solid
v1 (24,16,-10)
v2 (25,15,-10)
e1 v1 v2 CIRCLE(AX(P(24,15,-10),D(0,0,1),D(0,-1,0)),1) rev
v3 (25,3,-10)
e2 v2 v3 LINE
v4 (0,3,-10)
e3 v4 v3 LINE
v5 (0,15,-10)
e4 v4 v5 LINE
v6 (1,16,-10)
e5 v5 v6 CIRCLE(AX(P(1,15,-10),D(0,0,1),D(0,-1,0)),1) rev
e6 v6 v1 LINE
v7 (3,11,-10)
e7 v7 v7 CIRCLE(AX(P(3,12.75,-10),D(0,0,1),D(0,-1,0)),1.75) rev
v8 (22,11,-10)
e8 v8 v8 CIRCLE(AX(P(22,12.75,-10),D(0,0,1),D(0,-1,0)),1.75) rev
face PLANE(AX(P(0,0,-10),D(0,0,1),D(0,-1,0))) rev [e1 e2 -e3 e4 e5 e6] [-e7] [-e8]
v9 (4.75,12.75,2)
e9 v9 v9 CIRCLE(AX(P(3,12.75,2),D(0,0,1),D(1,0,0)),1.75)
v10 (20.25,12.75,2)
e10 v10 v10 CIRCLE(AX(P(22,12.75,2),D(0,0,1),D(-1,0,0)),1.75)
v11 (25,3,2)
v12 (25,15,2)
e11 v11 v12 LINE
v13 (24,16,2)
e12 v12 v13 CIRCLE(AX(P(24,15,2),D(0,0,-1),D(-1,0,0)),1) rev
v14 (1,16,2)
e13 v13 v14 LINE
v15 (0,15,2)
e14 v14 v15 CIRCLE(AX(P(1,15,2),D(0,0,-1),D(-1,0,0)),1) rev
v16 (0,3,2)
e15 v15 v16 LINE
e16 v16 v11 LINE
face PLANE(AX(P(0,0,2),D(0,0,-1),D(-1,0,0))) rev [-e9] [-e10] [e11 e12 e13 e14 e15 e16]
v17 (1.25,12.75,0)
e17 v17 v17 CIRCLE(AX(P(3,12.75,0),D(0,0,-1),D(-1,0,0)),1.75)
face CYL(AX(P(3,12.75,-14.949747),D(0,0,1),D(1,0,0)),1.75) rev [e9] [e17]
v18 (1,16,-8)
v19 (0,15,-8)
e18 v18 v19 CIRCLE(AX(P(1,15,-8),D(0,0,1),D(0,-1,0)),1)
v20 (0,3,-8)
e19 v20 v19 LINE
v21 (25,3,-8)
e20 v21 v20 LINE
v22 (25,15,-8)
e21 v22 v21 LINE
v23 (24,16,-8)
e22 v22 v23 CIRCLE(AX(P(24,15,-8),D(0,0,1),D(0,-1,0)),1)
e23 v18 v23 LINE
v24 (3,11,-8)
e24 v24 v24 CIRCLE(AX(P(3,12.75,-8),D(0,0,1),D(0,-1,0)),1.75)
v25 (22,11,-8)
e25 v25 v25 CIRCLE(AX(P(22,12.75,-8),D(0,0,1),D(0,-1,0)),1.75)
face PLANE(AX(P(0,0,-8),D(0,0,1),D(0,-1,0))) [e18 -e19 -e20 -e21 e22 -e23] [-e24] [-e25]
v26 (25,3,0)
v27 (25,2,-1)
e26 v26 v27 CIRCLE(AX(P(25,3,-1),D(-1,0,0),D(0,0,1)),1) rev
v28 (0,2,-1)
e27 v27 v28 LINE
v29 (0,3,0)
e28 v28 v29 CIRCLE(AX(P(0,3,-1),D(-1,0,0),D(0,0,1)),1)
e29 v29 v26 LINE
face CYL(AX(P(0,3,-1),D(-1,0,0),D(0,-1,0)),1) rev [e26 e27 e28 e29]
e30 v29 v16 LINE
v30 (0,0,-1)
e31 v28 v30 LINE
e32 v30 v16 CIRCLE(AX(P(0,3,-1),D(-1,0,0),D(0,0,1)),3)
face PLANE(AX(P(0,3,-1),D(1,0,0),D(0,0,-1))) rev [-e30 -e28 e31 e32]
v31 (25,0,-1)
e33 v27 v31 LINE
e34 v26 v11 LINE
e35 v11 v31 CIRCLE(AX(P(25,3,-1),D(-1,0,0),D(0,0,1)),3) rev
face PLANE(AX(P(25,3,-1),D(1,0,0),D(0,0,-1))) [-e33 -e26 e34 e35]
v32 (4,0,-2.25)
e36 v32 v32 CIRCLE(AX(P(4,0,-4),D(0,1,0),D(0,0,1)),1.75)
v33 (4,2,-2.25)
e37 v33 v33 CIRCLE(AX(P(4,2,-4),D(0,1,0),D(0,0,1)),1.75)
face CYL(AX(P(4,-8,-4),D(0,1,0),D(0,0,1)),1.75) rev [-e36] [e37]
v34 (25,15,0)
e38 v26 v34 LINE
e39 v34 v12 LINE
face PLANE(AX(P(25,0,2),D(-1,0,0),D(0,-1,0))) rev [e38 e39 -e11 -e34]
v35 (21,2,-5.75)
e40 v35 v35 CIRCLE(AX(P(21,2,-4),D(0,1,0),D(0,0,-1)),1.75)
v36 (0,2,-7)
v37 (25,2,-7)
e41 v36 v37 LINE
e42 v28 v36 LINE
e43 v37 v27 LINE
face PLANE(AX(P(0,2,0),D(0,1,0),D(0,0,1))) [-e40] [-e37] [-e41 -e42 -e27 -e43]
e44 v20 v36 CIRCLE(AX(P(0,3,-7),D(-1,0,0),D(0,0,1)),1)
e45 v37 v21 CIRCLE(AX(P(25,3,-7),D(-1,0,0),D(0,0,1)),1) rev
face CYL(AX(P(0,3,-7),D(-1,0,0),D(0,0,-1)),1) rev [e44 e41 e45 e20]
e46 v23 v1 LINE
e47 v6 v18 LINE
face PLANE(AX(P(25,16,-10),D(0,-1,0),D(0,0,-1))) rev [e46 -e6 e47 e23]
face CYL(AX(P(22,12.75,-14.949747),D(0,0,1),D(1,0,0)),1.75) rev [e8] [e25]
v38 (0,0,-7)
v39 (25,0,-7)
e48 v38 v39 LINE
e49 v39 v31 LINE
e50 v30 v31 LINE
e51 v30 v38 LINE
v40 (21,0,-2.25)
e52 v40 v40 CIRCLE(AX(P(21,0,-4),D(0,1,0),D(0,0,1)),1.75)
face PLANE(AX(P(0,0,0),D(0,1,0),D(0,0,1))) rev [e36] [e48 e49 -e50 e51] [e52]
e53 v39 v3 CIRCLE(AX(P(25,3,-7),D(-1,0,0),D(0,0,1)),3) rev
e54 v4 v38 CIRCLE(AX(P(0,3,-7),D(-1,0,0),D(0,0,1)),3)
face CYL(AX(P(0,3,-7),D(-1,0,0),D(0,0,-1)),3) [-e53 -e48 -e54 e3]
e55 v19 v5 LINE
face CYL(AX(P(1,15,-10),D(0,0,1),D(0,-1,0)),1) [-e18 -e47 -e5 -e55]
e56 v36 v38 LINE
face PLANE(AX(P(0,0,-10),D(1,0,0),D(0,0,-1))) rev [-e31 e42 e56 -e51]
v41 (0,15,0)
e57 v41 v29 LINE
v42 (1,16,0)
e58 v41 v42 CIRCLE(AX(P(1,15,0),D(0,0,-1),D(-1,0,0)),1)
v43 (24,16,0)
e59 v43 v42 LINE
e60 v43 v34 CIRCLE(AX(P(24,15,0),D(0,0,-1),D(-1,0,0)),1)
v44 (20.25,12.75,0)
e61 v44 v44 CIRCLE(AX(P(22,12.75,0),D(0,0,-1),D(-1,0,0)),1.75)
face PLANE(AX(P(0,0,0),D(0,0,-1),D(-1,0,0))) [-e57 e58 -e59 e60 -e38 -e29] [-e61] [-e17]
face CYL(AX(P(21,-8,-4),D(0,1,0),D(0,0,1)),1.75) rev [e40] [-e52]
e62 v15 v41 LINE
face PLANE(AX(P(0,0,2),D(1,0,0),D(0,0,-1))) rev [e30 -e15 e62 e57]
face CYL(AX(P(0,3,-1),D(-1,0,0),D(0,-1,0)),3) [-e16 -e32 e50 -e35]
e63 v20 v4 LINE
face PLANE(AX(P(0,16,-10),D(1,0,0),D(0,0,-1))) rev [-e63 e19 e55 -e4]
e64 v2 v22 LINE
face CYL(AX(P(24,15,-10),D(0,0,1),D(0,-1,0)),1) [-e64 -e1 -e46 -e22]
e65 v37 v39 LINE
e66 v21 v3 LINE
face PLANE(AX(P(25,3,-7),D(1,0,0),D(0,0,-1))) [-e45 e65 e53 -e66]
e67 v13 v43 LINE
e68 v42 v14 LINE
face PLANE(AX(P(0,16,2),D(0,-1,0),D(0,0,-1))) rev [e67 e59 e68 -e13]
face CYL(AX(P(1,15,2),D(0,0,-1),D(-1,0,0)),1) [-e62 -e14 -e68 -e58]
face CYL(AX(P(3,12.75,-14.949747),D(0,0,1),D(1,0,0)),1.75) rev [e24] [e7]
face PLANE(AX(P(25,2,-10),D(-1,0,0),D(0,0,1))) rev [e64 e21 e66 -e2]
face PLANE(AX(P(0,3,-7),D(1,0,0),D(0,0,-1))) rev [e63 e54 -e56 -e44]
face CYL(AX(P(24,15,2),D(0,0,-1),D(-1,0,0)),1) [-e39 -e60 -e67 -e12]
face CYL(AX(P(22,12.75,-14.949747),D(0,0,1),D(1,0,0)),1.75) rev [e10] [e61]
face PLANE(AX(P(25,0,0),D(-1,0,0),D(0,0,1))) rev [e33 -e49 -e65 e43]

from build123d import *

# Parameters (mm, degrees)
ESBO_O9_W                      = 25
ESBO_O9_H                      = 16
FLANGE_BASE2_DEPTH             = 2
ARESTA_FLANGE2_STRIP_W         = 10
ARESTA_FLANGE2_STRIP_H         = 2
ARESTA_FLANGE2_STRIP_CUT_DEPTH = 25
ARESTA_FLANGE2_DEPTH           = 25
ARESTA_FLANGE3_STRIP_W         = 10
ARESTA_FLANGE3_STRIP_H         = 2
ARESTA_FLANGE3_STRIP_CUT_DEPTH = 25
ARESTA_FLANGE3_DEPTH           = 25
FILETE1_R                      = 1
CORTE_EXTRUS_O1_REACH          = 34.016
ESBO_O21_R                     = 1.75
ESBO_O22_R                     = 1.75
CORTE_EXTRUS_O2_DEPTH          = 10


# Sheet-metal steps are written as plain solids
with BuildPart() as part:
    # Esboço9 → Flange-base2 (new body)
    with BuildSketch(Plane.XY):
        with Locations((12.5, 8)):
            Rectangle(ESBO_O9_W, ESBO_O9_H)
    extrude(amount=FLANGE_BASE2_DEPTH)

    # Aresta-Flange2 strip (across the edge) → Aresta-Flange2 strip cut (cut)
    with BuildSketch(Plane(origin=(25, 0, 0), x_dir=(0, 1, 0), z_dir=(-1, 0, 0))):
        with Locations((-2, -1)):
            Rectangle(ARESTA_FLANGE2_STRIP_W, ARESTA_FLANGE2_STRIP_H)
    extrude(amount=ARESTA_FLANGE2_STRIP_CUT_DEPTH, mode=Mode.SUBTRACT)

    # Aresta-Flange2 section (across the edge) → Aresta-Flange2 (add)
    with BuildSketch(Plane(origin=(25, 0, 0), x_dir=(0, 1, 0), z_dir=(-1, 0, 0))):
        with BuildLine():
            Line((0, 1), (0, 10))
            Line((0, 10), (2, 10))
            Line((2, 10), (2, 1))
            ThreePointArc((2, 1), (2.292893219, 0.292893219), (3, 0))
            Line((3, 0), (3, -2))
            ThreePointArc((3, -2), (0.878679656, -1.121320344), (0, 1))
        make_face()
    extrude(amount=ARESTA_FLANGE2_DEPTH)

    # Aresta-Flange3 strip (across the edge) → Aresta-Flange3 strip cut (cut)
    with BuildSketch(Plane(origin=(25, 2, -10), x_dir=(0, 0, 1), z_dir=(-1, 0, 0))):
        with Locations((-2, -1)):
            Rectangle(ARESTA_FLANGE3_STRIP_W, ARESTA_FLANGE3_STRIP_H)
    extrude(amount=ARESTA_FLANGE3_STRIP_CUT_DEPTH, mode=Mode.SUBTRACT)

    # Aresta-Flange3 section (across the edge) → Aresta-Flange3 (add)
    with BuildSketch(Plane(origin=(25, 2, -10), x_dir=(0, 0, 1), z_dir=(-1, 0, 0))):
        with BuildLine():
            Line((0, 1), (0, 14))
            Line((0, 14), (2, 14))
            Line((2, 14), (2, 1))
            ThreePointArc((2, 1), (2.292893219, 0.292893219), (3, 0))
            Line((3, 0), (3, -2))
            ThreePointArc((3, -2), (0.878679656, -1.121320344), (0, 1))
        make_face()
    extrude(amount=ARESTA_FLANGE3_DEPTH)

    # Filete1
    filete1_edges = [part.edges().sort_by_distance(p)[0] for p in [
        (25, 16, -9),
        (0, 16, -9),
        (0, 16, 1),
        (25, 16, 1),
    ]]
    fillet(filete1_edges, radius=FILETE1_R)

    # Corte-extrusão1: up to this face of the body (flat: up to its plane)
    corte_extrus_o1_end = Plane(part.part.faces().sort_by_distance((12.5, 9.491699951, -10))[0])
    # Esboço21 → Corte-extrusão1 (cut, up to the picked face)
    with BuildSketch(Plane.XY.offset(2), mode=Mode.PRIVATE) as corte_extrus_o1_sk1:
        with Locations(Location((3, 12.75, 0), (0, 0, 270))):
            Circle(ESBO_O21_R)
    corte_extrus_o1_tool1 = split(extrude(corte_extrus_o1_sk1.sketch, amount=-CORTE_EXTRUS_O1_REACH, mode=Mode.PRIVATE), bisect_by=corte_extrus_o1_end, keep=Keep.BOTH, mode=Mode.PRIVATE)
    # Esboço21 → Corte-extrusão1 (cut, up to the picked face)
    with BuildSketch(Plane.XY.offset(2), mode=Mode.PRIVATE) as corte_extrus_o1_sk2:
        with Locations(Location((22, 12.75, 0), (0, 0, 270))):
            Circle(ESBO_O21_R)
    corte_extrus_o1_tool2 = split(extrude(corte_extrus_o1_sk2.sketch, amount=-CORTE_EXTRUS_O1_REACH, mode=Mode.PRIVATE), bisect_by=corte_extrus_o1_end, keep=Keep.BOTH, mode=Mode.PRIVATE)
    add(corte_extrus_o1_tool1.solids().sort_by(Axis((3, 12.75, 2), (0, 0, -1)))[0], mode=Mode.SUBTRACT)
    add(corte_extrus_o1_tool2.solids().sort_by(Axis((22, 12.75, 2), (0, 0, -1)))[0], mode=Mode.SUBTRACT)

    # Esboço22 → Corte-extrusão2 (cut)
    with BuildSketch(Plane(origin=(0, 2, 0), x_dir=(1, 0, 0), z_dir=(0, 1, 0))):
        with Locations(Location((4, 4, 0), (0, 0, 270))):
            Circle(ESBO_O22_R)
        with Locations(Location((21, 4, 0), (0, 0, 270))):
            Circle(ESBO_O22_R)
    extrude(amount=-CORTE_EXTRUS_O2_DEPTH, mode=Mode.SUBTRACT)


solid = part.part
